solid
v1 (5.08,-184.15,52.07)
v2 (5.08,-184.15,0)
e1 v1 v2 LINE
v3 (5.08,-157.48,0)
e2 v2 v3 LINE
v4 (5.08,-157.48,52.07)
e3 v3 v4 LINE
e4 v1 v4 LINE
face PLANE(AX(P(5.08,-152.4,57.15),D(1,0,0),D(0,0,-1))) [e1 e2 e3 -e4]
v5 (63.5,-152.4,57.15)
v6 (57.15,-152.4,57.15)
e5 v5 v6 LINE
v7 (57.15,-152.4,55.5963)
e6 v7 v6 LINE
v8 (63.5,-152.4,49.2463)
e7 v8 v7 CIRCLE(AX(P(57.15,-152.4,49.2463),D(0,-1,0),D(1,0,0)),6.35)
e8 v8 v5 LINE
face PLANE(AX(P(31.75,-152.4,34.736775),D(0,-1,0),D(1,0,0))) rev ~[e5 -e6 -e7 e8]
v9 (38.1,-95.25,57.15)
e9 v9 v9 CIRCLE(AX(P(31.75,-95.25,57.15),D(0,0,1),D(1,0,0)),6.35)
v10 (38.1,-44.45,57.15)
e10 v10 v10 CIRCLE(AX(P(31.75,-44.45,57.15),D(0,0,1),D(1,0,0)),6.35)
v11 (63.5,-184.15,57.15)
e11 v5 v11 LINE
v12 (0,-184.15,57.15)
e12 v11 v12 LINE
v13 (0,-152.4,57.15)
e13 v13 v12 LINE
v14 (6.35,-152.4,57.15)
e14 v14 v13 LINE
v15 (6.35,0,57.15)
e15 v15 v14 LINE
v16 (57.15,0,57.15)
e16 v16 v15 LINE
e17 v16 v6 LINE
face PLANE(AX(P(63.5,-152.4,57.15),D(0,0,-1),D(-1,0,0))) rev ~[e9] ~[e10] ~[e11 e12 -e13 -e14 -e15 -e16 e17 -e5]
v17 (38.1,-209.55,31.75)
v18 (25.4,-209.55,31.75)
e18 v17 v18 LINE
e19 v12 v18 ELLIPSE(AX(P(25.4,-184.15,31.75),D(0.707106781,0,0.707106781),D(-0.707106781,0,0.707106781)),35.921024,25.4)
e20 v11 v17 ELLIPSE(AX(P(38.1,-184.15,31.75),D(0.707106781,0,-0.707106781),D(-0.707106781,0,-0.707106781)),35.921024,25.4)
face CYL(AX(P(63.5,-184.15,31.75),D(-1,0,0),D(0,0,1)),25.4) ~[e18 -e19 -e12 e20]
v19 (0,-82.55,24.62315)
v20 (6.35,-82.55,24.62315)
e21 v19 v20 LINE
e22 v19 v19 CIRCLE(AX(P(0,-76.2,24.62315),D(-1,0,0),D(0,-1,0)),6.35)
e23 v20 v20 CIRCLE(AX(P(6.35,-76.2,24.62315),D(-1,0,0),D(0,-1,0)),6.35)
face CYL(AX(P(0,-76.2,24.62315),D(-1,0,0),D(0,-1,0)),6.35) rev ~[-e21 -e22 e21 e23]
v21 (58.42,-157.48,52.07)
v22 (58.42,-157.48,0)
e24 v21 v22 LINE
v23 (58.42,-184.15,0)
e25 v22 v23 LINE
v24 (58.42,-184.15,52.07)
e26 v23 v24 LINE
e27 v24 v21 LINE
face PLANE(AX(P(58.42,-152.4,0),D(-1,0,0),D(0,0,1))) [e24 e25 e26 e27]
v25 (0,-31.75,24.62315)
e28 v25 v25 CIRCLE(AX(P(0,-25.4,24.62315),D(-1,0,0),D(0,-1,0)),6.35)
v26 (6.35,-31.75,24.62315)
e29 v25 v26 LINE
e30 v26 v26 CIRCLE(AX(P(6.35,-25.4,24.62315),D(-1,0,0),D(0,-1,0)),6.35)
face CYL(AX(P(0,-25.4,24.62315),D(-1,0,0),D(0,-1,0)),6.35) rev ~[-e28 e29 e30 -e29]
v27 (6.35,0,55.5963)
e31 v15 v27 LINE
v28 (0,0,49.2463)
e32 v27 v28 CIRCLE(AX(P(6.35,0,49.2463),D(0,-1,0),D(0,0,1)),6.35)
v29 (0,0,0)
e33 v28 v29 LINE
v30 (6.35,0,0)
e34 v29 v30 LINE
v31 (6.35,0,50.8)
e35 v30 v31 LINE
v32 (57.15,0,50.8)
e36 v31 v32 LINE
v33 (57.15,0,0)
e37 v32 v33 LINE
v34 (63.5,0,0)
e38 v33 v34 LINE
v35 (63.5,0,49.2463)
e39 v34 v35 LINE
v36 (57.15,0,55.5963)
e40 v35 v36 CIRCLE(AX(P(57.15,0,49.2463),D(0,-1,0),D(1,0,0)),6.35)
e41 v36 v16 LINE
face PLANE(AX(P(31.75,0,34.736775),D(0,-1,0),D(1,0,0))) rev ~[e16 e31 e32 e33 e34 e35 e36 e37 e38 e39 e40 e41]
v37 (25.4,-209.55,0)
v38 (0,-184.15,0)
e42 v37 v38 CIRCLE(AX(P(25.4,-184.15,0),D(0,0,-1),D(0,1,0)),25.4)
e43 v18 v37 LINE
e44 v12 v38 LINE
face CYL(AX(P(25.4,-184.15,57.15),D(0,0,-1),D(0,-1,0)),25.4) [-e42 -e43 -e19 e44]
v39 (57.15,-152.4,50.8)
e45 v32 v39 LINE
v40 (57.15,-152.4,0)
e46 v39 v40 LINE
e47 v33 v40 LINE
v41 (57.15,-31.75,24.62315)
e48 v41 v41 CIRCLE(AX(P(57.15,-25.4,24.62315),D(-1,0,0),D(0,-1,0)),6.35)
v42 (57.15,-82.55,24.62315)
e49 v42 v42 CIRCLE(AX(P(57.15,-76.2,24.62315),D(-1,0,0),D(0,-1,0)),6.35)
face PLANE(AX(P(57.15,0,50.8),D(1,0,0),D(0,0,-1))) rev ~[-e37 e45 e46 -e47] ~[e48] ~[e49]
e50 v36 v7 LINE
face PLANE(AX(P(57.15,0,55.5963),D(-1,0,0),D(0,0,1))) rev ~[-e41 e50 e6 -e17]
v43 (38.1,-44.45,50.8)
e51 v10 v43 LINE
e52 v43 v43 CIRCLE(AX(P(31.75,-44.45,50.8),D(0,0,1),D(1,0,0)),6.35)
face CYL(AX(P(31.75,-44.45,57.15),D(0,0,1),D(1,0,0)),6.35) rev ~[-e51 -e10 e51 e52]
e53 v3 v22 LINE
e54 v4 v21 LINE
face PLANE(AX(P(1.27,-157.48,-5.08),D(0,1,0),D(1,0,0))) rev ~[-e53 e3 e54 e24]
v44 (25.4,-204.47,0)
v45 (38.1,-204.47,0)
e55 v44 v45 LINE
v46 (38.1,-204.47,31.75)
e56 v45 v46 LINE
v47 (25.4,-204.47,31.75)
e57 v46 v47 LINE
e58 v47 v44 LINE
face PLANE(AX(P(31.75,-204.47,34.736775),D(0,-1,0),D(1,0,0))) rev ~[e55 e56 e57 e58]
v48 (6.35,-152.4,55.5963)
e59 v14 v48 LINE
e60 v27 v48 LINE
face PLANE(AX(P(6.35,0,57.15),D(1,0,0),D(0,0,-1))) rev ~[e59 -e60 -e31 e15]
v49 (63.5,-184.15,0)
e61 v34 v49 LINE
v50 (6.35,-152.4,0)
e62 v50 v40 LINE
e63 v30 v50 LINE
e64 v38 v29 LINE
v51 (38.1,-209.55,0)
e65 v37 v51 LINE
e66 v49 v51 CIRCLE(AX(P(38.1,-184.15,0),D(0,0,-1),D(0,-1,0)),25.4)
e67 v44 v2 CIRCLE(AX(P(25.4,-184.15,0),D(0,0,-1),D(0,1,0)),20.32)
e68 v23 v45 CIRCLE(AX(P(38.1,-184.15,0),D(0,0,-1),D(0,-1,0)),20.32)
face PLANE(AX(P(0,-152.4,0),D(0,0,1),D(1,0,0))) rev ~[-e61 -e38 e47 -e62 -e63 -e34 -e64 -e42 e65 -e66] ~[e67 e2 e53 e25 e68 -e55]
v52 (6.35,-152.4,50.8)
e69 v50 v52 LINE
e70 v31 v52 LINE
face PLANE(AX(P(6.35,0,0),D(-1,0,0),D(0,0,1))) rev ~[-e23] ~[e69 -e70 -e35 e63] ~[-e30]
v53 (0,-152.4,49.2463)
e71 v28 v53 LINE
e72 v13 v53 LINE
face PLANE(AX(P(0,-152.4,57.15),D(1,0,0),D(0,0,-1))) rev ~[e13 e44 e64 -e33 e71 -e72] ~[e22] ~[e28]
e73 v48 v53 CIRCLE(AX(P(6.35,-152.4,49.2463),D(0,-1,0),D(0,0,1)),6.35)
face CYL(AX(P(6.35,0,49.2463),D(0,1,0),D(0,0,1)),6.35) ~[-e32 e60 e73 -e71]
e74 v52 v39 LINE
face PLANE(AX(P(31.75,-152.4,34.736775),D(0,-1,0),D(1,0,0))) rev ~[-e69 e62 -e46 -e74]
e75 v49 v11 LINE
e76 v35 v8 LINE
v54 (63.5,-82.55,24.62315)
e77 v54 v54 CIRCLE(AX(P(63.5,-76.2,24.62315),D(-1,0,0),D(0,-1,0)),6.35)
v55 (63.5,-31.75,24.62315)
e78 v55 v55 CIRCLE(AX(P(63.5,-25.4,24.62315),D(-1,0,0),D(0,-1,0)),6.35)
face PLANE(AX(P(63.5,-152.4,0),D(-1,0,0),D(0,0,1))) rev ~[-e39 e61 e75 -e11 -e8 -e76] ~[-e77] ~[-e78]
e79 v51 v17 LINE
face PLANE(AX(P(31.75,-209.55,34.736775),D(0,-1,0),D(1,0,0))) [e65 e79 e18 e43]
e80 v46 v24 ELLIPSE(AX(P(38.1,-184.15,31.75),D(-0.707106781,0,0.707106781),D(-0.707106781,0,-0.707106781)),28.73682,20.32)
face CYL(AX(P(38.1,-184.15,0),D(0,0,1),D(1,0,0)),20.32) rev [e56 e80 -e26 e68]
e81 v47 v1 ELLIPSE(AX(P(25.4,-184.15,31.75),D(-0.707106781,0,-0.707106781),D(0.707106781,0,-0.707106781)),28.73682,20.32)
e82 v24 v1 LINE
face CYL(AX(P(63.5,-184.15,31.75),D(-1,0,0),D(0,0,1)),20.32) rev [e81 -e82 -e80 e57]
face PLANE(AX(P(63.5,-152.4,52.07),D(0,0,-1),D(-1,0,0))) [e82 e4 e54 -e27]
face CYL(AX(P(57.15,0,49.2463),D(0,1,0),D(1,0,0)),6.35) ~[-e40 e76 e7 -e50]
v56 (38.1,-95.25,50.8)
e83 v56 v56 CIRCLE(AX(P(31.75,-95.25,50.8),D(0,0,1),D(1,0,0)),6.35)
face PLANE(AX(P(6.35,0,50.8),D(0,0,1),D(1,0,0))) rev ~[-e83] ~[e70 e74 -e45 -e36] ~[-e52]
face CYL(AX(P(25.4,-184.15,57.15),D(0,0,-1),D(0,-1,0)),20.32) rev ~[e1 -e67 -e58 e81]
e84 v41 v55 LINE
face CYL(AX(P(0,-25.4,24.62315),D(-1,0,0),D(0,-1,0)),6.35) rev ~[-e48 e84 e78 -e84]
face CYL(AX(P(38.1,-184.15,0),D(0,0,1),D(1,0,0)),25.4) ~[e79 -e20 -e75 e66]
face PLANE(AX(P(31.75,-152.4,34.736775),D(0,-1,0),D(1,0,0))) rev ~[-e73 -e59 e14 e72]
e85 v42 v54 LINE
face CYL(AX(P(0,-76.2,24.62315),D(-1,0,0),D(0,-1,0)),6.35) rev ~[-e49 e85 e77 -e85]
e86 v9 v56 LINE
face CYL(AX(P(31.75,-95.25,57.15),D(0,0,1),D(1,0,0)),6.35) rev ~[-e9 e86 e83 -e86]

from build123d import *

# Parameters (mm, degrees)
F1_DEPTH     = 152.4
F2_W         = 50.8
F2_H         = 50.8
F3_DEPTH     = 57.15
F4_R         = 25.4
F5_T         = 5.08
F5_T3_DEPTH  = 11.7136995755
F5_T5_DEPTH  = 162.56
F5_T7_DEPTH  = 60.96
F5_T9_DEPTH  = 60.96
F5_T12_ANGLE = 90.000000001
F5_T14_ANGLE = 90.000000001
F6_R         = 6.35
F7_DEPTH     = 63.501
F8_R         = 6.35
F9_DEPTH     = 57.151


# Not quite as in the source:
# - a shell that OpenCascade refuses in one call is made with other operations: the cavity is built on its own and cut out


with BuildPart() as f1:
    # F0 (on Front) → F1 (new body)
    with BuildSketch(Plane.XZ):
        with BuildLine():
            Line((0, 49.2463004245), (0, 0))
            Line((0, 0), (6.35, 0))
            Line((6.35, 0), (6.35, 50.8))
            Line((6.35, 50.8), (57.15, 50.8))
            Line((57.15, 50.8), (57.15, 0))
            Line((57.15, 0), (63.5, 0))
            Line((63.5, 0), (63.5, 49.2463004245))
            ThreePointArc((63.5, 49.2463004245), (61.6401280605, 53.736428485), (57.15, 55.5963004245))
            Line((57.15, 55.5963004245), (57.15, 57.15))
            Line((57.15, 57.15), (6.35, 57.15))
            Line((6.35, 57.15), (6.35, 55.5963004245))
            ThreePointArc((6.35, 55.5963004245), (1.8598719395, 53.736428485), (0, 49.2463004245))
        make_face()
    extrude(amount=F1_DEPTH)

    # F2 (on face) → F3 (join)
    with BuildSketch(Plane.XZ.offset(152.4)):
        with BuildLine():
            Line((0, 49.2463004245), (0, 0))
            Line((0, 0), (6.35, 0))
            Line((6.35, 0), (6.35, 50.8))
            Line((6.35, 50.8), (57.15, 50.8))
            Line((57.15, 50.8), (57.15, 0))
            Line((57.15, 0), (63.5, 0))
            Line((63.5, 0), (63.5, 49.2463004245))
            ThreePointArc((63.5, 49.2463004245), (61.6401280605, 53.736428485), (57.15, 55.5963004245))
            Line((57.15, 55.5963004245), (57.15, 57.15))
            Line((57.15, 57.15), (6.35, 57.15))
            Line((6.35, 57.15), (6.35, 55.5963004245))
            ThreePointArc((6.35, 55.5963004245), (1.8598719395, 53.736428485), (0, 49.2463004245))
        make_face()
        with BuildLine():
            Line((0, 57.15), (0, 49.2463004245))
            ThreePointArc((0, 49.2463004245), (1.8598719395, 53.736428485), (6.35, 55.5963004245))
            Line((6.35, 55.5963004245), (6.35, 57.15))
            Line((6.35, 57.15), (0, 57.15))
        make_face()
        with BuildLine():
            ThreePointArc((57.15, 55.5963004245), (61.6401280605, 53.736428485), (63.5, 49.2463004245))
            Line((63.5, 49.2463004245), (63.5, 57.15))
            Line((63.5, 57.15), (57.15, 57.15))
            Line((57.15, 57.15), (57.15, 55.5963004245))
        make_face()
        with Locations((31.75, 25.4)):
            Rectangle(F2_W, F2_H)
    extrude(amount=F3_DEPTH)

    # F4
    f4_edges = [f1.edges().sort_by_distance(p)[0] for p in [
        (31.75, -209.55, 57.15),
        (0, -209.55, 28.575),
        (63.5, -209.55, 28.575),
    ]]
    fillet(f4_edges, radius=F4_R)

    # F5: shell of thickness 5.08, made by hand


with BuildPart() as f5_core1:
    # F5_t2: copy of F1
    add(f1.part)

    # the walls: a layer under each face that stays
    f5_faces = [f5_core1.faces().sort_by_distance(p)[0] for p in [
        (0, -92.075, 28.575),
        (31.75, -92.075, 57.15),
        (7.4394877579, -202.1105122421, 28.575),
        (1.0583333333, -152.4, 53.1981502122),
        (1.8598719395, -76.2, 53.736428485),
        (4.5357142857, 0, 4.0821428571),
        (63.5, -92.075, 28.575),
        (31.75, -202.1105122421, 49.7105122421),
        (58.2083333333, -152.4, 55.8327167374),
        (57.15, -76.2, 56.3731502122),
        (6.35, -76.2, 56.3731502122),
        (31.75, -209.55, 15.875),
        (6.35, -76.2, 25.4),
        (56.0605122421, -202.1105122421, 28.575),
        (31.75, -152.4, 25.4),
        (57.15, -76.2, 25.4),
        (31.75, -76.2, 50.8),
        (61.6401280605, -76.2, 53.736428485),
    ]]
    thicken(f5_faces, amount=-F5_T, mode=Mode.SUBTRACT)

    # F5_s4 → F5_t3 (cut)
    with BuildSketch(Plane.XY.offset(50.5163004245)):
        Polygon((6.2992, -152.3492), (6.35, -157.48), (11.43, -157.48), (11.43, -152.4), align=None)
        Polygon((57.2008, -152.3492), (57.15, -157.48), (52.07, -157.48), (52.07, -152.4), align=None)
    extrude(amount=F5_T3_DEPTH, mode=Mode.SUBTRACT)

    # F5_s6 → F5_t5 (cut)
    with BuildSketch(Plane.XZ.offset(-5.08)):
        Polygon((6.2992, 55.6471004245), (6.35, 50.5163004245), (11.43, 50.5163004245), (11.43, 55.5963004245), align=None)
        Polygon((57.2008, 55.6471004245), (52.07, 55.5963004245), (52.07, 50.5163004245), (57.15, 50.5163004245), align=None)
        Polygon((6.4008, 50.7492), (1.27, 50.8), (1.27, 55.88), (6.35, 55.88), align=None)
        Polygon((57.0992, 50.7492), (62.23, 50.8), (62.23, 55.88), (57.15, 55.88), align=None)
    extrude(amount=F5_T5_DEPTH, mode=Mode.SUBTRACT)

    # F5_s8 → F5_t7 (cut)
    with BuildSketch(Plane.XY.offset(-5.08)):
        Polygon((6.4008, -152.3492), (1.27, -152.4), (1.27, -157.48), (6.35, -157.48), align=None)
        Polygon((57.0992, -152.3492), (57.15, -157.48), (62.23, -157.48), (62.23, -152.4), align=None)
    extrude(amount=F5_T7_DEPTH, mode=Mode.SUBTRACT)

    # F5_s10 → F5_t9 (cut)
    with BuildSketch(Plane.YZ.offset(1.27)):
        Polygon((-152.3492, 50.7492), (-157.48, 50.8), (-157.48, 55.88), (-152.4, 55.88), align=None)
    extrude(amount=F5_T9_DEPTH, mode=Mode.SUBTRACT)

    # F5_s11 → F5_t12 (revolve, cut)
    with BuildSketch(Plane.YZ.offset(6.35)):
        Polygon((-152.3492, 55.6471004245), (-157.48, 55.5963004245), (-157.48, 50.5163004245), (-152.4, 50.5163004245), align=None)
    revolve(axis=Axis((6.35, -152.4, 49.2463004245), (0, -1, 0)), revolution_arc=F5_T12_ANGLE, mode=Mode.SUBTRACT)

    # F5_s13 → F5_t14 (revolve, cut)
    with BuildSketch(Plane.XY.offset(49.2463004245)):
        Polygon((63.5508, -152.3492), (63.5, -157.48), (58.42, -157.48), (58.42, -152.4), align=None)
    revolve(axis=Axis((57.15, -152.4, 49.2463004245), (0, -1, 0)), revolution_arc=F5_T14_ANGLE, mode=Mode.SUBTRACT)


with BuildPart() as f1_1:
    add(f1.part)

    # what is left inside the walls is the cavity
    f5_cavity = [f5_core1.part.solids().sort_by_distance(p)[0] for p in [
        (31.75, -157.5308, 34.713333),
    ]]
    add(f5_cavity, mode=Mode.SUBTRACT)

    # F6 (on face) → F7 (cut, through all)
    with BuildSketch(Plane(origin=(0, 0, 0), x_dir=(0, -1, 0), z_dir=(-1, 0, 0))):
        with Locations((25.4, 24.6231502122)):
            Circle(F6_R)
        with Locations((76.2, 24.6231502122)):
            Circle(F6_R)
    extrude(amount=-F7_DEPTH, mode=Mode.SUBTRACT)

    # F8 (on face) → F9 (cut, through all)
    with BuildSketch(Plane.XY.offset(57.15)):
        with Locations((31.75, -44.45)):
            Circle(F8_R)
        with Locations((31.75, -95.25)):
            Circle(F8_R)
    extrude(amount=-F9_DEPTH, mode=Mode.SUBTRACT)


solid = f1_1.part
